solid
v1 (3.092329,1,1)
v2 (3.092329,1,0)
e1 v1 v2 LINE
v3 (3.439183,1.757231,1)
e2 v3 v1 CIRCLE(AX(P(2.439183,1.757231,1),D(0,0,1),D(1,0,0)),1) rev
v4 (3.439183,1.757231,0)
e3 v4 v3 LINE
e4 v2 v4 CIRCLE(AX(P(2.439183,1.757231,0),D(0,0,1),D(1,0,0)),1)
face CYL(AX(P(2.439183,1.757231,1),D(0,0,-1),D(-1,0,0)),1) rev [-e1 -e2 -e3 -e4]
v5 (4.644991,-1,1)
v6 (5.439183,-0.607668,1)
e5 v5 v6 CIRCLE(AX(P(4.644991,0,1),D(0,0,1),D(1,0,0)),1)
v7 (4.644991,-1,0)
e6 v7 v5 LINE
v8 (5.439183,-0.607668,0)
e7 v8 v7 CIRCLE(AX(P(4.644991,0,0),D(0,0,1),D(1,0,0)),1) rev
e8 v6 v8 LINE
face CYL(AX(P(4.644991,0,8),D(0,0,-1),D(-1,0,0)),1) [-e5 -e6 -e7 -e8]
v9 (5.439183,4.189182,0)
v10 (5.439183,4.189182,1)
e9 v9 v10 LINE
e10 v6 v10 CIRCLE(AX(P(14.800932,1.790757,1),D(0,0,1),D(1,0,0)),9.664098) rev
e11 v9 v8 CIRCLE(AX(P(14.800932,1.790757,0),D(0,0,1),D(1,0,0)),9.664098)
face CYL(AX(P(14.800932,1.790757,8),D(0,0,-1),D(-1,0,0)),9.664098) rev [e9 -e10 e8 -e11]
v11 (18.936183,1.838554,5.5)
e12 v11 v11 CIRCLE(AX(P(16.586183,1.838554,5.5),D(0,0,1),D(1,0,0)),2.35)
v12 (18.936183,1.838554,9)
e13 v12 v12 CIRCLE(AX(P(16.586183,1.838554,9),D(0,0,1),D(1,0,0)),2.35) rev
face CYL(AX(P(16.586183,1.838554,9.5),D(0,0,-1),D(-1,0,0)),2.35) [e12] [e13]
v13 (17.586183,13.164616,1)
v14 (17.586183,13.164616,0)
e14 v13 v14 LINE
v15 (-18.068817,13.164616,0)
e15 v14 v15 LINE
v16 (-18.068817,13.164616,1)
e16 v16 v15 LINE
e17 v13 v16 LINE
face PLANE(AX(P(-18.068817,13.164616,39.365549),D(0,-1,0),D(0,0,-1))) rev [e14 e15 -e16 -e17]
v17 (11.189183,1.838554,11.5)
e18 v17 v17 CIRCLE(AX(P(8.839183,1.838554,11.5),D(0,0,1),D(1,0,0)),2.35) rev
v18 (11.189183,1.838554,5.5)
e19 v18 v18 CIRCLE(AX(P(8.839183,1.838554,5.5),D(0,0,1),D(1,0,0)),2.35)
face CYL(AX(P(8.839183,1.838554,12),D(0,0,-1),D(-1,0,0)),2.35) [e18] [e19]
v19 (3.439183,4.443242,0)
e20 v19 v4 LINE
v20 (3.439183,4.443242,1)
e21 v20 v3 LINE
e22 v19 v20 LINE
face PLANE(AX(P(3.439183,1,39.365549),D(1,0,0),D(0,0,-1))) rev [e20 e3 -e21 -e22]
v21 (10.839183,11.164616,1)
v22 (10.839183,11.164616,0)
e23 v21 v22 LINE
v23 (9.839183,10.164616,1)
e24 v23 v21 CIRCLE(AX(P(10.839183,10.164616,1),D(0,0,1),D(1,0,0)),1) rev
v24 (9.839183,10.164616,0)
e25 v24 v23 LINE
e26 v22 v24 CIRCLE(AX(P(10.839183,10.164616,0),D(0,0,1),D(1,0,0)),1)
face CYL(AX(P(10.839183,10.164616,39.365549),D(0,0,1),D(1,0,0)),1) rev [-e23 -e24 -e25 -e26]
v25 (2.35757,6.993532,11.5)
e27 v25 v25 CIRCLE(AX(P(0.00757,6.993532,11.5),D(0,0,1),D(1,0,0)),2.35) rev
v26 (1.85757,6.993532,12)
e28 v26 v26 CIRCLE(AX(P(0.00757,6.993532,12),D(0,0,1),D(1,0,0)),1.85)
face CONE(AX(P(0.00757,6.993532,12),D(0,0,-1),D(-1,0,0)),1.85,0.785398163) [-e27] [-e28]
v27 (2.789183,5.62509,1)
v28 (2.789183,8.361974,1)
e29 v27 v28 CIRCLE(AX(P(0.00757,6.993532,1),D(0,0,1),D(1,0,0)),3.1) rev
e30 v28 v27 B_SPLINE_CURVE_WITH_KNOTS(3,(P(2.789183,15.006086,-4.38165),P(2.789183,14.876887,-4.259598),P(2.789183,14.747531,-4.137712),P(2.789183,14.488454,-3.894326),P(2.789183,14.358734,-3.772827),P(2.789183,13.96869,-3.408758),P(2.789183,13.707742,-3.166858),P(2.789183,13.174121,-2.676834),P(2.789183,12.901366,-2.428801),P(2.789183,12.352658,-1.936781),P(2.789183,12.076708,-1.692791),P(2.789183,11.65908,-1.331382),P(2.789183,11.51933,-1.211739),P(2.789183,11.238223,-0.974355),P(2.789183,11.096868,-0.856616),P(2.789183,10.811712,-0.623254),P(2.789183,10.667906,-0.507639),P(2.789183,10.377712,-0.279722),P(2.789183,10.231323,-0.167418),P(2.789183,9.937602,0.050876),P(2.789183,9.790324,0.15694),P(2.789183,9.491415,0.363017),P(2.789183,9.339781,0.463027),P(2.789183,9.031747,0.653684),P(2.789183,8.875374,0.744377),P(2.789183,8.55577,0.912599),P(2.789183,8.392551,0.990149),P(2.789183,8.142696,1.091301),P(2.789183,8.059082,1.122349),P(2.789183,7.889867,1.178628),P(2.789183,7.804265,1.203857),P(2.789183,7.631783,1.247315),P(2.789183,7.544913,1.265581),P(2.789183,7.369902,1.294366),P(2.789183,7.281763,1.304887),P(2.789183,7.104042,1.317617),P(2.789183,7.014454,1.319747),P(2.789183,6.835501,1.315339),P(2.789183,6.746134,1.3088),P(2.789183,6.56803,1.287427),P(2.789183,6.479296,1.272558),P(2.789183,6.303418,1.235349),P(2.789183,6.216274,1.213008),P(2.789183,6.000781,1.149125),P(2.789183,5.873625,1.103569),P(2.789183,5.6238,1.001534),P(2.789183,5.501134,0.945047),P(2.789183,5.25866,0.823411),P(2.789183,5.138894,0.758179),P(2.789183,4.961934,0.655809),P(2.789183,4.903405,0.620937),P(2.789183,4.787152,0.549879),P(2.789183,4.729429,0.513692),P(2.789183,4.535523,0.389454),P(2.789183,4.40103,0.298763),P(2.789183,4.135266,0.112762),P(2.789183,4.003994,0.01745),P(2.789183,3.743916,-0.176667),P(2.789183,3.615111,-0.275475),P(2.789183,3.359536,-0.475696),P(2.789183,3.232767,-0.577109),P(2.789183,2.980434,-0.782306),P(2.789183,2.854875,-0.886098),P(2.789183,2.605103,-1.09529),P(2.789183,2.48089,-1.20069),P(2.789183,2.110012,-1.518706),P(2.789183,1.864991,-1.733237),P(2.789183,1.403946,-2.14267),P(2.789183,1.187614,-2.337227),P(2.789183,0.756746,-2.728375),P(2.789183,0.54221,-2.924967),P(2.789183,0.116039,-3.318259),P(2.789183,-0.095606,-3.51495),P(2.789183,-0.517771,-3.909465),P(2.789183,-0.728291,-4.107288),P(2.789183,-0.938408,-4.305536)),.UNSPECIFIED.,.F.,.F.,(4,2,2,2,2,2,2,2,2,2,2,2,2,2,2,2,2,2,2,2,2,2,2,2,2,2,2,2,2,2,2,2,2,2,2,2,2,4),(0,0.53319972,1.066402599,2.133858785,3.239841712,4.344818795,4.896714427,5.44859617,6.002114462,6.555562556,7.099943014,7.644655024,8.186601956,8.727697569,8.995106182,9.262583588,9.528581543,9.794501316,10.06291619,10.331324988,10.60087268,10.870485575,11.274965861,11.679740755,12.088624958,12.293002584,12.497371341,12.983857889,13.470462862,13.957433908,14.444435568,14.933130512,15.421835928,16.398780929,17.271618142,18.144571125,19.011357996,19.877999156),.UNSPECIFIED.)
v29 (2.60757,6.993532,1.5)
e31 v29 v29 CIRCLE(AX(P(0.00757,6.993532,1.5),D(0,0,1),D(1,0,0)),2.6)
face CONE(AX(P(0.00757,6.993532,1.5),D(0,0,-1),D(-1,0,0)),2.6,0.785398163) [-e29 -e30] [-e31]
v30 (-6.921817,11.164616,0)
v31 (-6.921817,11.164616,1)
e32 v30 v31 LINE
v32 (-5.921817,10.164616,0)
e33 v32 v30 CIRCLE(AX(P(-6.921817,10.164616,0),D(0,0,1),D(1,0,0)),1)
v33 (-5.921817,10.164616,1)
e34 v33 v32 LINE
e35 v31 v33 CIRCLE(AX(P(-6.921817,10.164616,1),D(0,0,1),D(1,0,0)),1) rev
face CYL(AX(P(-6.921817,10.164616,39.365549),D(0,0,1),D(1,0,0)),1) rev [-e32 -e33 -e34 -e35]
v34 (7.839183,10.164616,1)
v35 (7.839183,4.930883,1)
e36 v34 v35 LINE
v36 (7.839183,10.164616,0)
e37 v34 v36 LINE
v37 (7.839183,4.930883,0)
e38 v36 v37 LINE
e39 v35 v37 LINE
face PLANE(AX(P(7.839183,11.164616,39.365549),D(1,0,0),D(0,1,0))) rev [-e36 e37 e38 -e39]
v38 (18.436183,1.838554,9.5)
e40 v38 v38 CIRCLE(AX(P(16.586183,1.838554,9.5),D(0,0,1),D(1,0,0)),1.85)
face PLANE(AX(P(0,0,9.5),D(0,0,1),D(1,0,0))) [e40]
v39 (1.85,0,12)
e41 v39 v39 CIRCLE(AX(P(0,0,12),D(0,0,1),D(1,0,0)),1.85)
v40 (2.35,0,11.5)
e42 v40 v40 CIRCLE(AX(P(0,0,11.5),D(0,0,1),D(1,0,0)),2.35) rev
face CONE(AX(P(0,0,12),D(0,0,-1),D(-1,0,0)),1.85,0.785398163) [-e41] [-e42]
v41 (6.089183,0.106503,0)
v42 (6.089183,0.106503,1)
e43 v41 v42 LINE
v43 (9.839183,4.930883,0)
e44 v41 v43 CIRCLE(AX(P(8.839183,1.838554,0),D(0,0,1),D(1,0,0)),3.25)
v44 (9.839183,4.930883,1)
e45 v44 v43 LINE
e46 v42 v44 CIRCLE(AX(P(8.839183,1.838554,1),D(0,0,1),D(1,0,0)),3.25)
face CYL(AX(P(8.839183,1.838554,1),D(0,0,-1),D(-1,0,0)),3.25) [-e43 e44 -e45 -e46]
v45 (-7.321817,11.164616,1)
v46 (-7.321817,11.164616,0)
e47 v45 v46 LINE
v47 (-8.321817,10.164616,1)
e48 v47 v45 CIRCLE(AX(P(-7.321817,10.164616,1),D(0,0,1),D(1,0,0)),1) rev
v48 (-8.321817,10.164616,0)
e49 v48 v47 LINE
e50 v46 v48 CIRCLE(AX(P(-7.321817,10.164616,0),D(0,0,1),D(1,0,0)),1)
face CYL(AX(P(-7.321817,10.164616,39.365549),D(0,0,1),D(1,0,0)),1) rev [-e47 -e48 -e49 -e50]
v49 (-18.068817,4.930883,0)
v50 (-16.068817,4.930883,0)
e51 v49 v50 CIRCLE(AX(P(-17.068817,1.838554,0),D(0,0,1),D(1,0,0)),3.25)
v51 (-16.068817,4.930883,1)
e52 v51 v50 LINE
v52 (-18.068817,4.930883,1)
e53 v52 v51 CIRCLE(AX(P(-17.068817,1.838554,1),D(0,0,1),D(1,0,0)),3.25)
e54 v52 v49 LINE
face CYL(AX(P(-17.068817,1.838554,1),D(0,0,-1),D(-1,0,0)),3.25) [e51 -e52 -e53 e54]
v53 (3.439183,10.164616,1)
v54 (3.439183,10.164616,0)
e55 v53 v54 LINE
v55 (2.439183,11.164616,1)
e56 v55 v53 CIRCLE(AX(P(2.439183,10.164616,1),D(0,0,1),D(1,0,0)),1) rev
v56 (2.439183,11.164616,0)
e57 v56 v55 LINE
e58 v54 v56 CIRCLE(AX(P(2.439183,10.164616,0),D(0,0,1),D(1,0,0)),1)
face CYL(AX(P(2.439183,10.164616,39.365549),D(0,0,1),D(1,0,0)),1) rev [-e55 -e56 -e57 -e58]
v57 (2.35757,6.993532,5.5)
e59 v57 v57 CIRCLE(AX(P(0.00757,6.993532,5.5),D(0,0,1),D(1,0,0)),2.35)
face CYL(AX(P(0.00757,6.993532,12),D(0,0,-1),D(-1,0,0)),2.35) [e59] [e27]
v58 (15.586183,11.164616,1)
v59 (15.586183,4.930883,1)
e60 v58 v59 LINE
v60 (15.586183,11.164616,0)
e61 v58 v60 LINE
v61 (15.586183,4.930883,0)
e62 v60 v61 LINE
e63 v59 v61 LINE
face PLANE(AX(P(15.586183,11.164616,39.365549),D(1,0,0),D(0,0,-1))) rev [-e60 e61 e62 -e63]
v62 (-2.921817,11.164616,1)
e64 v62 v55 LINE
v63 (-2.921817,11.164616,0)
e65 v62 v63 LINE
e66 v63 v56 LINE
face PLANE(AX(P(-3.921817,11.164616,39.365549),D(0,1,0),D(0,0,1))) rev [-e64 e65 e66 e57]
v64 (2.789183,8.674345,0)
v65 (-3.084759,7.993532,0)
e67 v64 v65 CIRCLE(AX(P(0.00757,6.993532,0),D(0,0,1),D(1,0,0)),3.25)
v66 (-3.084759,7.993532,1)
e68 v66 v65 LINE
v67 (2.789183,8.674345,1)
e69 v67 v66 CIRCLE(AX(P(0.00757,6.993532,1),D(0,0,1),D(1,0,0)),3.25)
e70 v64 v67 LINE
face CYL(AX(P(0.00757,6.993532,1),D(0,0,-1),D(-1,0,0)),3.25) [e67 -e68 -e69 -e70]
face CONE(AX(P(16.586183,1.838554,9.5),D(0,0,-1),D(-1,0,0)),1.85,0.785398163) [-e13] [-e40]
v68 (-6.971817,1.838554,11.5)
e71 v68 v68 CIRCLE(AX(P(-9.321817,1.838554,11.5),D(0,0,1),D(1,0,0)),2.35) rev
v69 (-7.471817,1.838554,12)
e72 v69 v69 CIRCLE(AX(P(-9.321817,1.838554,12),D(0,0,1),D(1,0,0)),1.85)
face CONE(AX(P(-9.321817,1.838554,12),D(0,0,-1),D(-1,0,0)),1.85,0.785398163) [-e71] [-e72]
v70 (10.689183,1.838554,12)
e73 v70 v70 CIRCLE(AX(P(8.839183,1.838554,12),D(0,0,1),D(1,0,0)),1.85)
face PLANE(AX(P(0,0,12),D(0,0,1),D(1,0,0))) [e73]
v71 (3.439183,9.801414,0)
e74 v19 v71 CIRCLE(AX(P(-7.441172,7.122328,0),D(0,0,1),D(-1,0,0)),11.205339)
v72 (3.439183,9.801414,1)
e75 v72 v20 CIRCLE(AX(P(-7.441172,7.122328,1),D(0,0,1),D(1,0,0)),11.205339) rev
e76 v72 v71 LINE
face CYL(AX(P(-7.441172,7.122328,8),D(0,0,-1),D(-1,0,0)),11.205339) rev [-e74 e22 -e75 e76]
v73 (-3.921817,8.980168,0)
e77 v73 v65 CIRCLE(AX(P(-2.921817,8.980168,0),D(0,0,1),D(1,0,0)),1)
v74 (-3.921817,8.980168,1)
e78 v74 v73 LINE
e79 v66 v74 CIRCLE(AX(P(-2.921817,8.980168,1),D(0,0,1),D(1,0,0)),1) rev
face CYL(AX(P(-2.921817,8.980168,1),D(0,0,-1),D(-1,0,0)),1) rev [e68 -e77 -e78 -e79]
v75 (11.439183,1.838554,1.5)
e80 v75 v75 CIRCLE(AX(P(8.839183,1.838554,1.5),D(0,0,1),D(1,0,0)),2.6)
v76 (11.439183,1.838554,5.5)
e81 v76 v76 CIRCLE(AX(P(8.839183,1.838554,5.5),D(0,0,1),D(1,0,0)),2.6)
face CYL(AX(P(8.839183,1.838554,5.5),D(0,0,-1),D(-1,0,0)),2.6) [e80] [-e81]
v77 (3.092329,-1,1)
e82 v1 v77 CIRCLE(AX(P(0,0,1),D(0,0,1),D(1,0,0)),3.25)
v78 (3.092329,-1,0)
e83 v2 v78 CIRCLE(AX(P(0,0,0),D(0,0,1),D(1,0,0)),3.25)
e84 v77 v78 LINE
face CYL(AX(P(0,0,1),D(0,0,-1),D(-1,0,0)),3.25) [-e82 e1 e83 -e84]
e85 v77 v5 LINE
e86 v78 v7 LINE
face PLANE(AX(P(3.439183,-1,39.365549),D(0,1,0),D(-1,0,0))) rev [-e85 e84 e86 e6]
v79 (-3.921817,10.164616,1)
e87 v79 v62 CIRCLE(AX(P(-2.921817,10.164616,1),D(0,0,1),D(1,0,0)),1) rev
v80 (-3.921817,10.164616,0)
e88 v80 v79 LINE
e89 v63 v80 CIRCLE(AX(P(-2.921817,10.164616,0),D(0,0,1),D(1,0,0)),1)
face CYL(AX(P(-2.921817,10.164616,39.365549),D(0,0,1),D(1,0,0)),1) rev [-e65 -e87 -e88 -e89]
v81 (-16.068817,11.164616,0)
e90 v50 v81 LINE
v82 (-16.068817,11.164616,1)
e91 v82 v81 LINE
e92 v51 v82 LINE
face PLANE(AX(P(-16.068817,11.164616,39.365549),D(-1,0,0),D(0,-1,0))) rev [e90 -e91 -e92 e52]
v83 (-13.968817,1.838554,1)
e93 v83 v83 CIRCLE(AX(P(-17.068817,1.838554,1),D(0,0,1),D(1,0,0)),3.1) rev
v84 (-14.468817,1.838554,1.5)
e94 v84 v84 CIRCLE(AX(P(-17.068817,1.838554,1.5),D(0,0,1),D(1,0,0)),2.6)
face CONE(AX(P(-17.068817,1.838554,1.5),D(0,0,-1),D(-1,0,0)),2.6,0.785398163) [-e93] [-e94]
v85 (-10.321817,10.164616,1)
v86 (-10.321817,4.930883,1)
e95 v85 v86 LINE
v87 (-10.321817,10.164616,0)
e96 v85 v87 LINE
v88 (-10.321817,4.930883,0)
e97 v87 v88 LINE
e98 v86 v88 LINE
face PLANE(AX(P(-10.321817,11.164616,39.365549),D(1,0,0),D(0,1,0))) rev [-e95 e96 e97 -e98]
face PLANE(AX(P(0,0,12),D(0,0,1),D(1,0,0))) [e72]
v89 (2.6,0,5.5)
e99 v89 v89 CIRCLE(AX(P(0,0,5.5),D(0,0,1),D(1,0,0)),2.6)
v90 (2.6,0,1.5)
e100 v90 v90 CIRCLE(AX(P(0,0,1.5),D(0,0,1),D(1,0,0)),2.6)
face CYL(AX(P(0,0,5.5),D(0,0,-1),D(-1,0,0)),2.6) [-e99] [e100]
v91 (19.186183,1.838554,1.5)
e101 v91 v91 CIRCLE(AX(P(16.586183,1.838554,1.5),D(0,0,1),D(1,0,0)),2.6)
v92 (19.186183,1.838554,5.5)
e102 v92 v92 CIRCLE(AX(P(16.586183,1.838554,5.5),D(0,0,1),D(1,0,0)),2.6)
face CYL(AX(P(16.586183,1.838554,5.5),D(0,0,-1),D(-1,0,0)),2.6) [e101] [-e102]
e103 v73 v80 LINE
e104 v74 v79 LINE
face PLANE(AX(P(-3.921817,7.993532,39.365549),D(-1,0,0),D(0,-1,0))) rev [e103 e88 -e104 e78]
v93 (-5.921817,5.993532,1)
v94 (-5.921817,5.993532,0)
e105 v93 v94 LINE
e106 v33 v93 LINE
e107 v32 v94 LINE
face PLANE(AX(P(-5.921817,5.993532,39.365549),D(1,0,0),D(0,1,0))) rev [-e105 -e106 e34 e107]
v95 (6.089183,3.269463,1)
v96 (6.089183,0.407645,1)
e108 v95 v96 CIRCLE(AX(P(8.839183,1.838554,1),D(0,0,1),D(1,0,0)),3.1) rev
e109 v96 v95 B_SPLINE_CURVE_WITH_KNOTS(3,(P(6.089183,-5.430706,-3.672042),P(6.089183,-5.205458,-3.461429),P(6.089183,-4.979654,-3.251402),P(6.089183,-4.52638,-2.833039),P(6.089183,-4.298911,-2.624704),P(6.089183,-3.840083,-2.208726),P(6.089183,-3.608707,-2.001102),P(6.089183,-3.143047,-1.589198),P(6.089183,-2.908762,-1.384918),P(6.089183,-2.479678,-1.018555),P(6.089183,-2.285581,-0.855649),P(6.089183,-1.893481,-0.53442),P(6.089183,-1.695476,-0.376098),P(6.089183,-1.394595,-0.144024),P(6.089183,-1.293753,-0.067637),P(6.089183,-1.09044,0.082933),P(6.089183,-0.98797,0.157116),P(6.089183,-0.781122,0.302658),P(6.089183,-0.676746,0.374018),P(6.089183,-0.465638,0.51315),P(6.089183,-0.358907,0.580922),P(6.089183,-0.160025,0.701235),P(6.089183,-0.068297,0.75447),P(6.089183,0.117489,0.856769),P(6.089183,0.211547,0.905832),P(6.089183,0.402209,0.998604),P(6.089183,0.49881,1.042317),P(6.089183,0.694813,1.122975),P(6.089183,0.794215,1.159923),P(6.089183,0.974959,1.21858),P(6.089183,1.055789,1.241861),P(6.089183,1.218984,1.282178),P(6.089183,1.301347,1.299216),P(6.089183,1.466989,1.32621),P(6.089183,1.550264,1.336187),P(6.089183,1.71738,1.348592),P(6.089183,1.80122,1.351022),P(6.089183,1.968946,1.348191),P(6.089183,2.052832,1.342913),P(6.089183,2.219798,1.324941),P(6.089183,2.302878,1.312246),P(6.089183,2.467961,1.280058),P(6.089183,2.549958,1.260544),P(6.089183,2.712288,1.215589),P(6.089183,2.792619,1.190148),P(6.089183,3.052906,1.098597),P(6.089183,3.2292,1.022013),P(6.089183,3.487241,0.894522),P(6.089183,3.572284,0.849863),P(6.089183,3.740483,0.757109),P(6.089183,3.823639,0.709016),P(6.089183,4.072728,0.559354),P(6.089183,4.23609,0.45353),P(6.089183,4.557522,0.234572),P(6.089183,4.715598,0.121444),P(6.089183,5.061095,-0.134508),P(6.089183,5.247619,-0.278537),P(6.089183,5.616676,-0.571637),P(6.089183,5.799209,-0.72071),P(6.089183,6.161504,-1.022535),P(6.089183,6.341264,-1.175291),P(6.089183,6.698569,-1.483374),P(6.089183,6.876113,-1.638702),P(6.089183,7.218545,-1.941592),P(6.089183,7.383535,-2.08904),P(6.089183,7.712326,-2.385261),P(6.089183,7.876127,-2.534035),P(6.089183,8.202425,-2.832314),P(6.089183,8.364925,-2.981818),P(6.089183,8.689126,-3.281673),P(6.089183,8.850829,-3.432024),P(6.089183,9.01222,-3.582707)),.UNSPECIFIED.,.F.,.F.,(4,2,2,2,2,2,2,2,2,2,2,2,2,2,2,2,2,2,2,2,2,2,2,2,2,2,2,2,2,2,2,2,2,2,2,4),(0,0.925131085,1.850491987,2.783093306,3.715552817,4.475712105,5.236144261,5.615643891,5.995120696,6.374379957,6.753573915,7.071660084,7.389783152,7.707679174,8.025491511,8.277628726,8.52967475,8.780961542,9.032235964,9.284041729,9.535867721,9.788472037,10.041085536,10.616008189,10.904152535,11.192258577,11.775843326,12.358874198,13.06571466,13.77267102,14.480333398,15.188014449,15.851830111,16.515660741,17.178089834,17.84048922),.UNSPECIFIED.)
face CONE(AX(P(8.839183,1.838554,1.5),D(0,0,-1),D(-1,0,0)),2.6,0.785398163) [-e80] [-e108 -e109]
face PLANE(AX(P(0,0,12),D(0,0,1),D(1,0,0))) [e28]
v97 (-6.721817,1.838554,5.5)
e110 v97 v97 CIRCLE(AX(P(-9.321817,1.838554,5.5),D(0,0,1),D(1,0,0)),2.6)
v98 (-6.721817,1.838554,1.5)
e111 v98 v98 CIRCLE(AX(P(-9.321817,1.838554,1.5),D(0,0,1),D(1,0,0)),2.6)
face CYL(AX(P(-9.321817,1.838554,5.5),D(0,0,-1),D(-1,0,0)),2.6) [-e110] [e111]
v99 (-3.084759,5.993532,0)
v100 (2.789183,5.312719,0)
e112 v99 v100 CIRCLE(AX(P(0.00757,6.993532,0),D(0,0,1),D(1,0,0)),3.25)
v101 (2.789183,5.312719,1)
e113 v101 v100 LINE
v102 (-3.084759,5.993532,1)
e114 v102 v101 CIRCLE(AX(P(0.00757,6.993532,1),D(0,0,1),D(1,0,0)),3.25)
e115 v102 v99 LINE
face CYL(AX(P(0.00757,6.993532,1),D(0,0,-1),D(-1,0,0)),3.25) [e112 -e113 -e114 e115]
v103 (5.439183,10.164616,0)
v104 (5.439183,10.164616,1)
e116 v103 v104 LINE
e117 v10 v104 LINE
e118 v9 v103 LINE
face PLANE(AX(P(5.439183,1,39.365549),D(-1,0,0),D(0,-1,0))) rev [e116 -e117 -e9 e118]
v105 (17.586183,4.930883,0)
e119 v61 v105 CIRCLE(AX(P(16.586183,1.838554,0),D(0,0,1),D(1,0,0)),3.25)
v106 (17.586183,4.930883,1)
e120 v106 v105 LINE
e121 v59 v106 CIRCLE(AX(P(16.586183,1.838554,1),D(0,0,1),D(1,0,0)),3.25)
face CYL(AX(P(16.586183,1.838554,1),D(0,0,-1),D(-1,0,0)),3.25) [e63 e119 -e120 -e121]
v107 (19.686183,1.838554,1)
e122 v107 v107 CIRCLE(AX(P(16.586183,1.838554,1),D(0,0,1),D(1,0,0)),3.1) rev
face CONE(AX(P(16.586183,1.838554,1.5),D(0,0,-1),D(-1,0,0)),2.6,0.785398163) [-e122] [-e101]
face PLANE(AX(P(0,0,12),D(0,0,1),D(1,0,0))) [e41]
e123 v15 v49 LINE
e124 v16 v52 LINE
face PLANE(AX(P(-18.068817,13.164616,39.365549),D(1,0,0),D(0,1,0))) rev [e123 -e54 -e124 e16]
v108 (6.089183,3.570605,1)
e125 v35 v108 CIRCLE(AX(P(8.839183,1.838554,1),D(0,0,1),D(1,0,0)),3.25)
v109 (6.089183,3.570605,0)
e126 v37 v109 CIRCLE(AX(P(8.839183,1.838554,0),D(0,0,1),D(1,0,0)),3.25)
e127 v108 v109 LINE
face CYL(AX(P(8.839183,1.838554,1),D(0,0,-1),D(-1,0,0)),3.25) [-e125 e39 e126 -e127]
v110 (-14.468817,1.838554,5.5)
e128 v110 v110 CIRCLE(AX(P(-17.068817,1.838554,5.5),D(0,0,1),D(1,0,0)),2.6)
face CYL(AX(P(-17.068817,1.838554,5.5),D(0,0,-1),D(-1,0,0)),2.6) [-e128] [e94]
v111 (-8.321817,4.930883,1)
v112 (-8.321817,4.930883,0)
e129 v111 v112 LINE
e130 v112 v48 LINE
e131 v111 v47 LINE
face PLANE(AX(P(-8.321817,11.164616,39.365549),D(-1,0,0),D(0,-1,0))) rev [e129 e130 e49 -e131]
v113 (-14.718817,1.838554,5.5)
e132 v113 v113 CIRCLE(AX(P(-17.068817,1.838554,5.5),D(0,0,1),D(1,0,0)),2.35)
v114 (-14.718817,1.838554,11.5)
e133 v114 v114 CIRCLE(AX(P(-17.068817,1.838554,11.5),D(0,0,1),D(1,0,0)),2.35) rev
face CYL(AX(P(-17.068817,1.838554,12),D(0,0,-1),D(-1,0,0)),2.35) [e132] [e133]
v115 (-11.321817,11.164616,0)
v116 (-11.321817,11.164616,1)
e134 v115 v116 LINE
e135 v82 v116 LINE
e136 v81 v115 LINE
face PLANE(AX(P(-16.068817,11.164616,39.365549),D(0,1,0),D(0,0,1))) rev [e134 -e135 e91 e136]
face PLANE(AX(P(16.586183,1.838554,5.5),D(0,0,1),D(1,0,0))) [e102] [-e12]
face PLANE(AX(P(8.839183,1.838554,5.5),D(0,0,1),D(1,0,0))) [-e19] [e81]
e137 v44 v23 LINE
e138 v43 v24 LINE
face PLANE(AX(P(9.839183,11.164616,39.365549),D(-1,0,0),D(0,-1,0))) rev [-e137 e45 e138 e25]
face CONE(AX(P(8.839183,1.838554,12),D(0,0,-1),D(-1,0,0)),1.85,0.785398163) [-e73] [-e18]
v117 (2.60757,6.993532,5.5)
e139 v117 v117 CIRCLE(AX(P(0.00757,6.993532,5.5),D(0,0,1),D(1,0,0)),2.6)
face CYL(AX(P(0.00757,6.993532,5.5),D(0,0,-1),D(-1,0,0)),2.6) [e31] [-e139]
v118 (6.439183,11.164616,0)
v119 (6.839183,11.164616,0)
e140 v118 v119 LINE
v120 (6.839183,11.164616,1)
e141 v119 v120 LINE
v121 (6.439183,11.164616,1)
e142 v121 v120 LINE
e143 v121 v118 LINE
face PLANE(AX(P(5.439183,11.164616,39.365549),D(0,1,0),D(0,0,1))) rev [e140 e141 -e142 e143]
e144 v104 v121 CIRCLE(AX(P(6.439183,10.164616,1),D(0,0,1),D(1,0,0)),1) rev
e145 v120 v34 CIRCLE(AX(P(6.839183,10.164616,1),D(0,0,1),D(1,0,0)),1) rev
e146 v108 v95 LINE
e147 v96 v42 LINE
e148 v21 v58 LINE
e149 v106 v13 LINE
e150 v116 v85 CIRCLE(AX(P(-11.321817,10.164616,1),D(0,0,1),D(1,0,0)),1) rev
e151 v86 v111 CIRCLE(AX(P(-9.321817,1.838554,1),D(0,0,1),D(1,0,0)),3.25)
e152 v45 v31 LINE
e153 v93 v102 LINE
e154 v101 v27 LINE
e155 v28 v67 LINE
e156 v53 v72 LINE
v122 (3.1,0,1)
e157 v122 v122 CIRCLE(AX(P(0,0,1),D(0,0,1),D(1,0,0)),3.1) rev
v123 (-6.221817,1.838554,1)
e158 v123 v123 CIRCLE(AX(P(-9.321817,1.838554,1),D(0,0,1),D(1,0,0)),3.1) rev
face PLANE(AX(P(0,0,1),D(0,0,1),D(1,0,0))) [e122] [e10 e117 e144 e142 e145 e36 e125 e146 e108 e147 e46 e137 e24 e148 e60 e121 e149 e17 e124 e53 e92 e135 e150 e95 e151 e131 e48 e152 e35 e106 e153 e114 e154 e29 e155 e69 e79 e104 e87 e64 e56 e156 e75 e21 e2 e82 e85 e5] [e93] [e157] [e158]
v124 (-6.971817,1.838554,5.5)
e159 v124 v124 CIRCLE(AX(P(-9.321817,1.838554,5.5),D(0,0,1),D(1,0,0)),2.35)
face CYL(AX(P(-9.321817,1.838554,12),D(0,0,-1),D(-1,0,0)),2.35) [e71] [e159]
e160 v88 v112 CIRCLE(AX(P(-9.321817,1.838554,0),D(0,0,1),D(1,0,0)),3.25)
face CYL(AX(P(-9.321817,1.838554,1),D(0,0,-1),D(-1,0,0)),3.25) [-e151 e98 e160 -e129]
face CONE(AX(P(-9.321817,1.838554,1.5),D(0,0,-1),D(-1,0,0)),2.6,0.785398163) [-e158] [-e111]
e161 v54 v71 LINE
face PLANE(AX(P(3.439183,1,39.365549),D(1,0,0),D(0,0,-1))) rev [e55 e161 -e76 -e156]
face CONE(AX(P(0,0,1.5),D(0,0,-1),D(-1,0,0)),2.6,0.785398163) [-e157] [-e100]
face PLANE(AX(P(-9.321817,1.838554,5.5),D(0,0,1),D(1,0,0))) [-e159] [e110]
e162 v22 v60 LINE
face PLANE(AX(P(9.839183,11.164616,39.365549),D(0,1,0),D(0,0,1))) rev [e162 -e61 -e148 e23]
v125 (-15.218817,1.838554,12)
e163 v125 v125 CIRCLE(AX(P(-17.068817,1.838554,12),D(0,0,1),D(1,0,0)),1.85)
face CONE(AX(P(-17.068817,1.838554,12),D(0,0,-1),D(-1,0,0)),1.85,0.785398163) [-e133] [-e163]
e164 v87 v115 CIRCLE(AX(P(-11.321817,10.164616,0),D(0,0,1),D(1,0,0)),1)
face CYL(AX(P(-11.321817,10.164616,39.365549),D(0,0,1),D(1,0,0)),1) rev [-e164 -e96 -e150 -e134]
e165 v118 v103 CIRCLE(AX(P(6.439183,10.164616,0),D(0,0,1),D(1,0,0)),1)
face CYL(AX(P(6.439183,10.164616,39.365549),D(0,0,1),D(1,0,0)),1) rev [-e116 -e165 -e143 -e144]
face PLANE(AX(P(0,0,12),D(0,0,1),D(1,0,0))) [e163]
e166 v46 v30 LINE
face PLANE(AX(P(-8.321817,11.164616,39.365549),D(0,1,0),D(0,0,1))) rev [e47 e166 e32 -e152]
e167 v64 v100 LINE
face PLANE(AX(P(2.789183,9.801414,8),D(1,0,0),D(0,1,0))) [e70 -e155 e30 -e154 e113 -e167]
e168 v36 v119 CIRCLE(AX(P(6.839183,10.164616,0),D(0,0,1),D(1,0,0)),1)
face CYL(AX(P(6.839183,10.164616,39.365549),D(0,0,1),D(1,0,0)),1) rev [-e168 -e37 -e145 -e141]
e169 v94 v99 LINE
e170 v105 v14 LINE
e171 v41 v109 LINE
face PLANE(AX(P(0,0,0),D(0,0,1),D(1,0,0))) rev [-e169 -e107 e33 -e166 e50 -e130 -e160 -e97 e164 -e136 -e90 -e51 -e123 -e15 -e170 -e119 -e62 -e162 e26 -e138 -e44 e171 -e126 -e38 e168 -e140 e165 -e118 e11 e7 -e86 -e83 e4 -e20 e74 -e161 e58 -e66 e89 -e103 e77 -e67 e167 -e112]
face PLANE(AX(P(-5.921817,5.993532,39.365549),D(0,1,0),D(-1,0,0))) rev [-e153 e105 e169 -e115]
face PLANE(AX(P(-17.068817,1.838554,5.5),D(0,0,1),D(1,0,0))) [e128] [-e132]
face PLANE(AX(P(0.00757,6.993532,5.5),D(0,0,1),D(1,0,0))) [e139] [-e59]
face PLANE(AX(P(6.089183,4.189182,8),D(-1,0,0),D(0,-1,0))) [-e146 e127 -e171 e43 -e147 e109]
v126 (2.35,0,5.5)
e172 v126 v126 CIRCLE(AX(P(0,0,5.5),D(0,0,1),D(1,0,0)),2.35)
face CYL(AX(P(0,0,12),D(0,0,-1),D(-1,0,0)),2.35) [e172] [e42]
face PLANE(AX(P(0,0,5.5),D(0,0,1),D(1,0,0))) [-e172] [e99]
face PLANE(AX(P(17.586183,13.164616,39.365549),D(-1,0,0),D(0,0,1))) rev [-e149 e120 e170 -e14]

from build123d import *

# Parameters (mm, degrees)
SKIZZE1_R                            = 2.35
AUFSATZ_LINEAR_AUSTRAGEN1_DEPTH      = 12
AUFSATZ_LINEAR_AUSTRAGEN1_2_DEPTH    = 12
AUFSATZ_LINEAR_AUSTRAGEN1_3_DEPTH    = 12
AUFSATZ_LINEAR_AUSTRAGEN1_4_DEPTH    = 12
AUFSATZ_LINEAR_AUSTRAGEN1_5_DEPTH    = 12
SKIZZE1_3_R                          = 2.35
AUFSATZ_LINEAR_AUSTRAGEN4_DEPTH      = 9.5
SKIZZE2_R                            = 3.25
AUFSATZ_LINEAR_AUSTRAGEN2_DEPTH      = 1
AUFSATZ_LINEAR_AUSTRAGEN3_DEPTH      = 1
SKIZZE5_R                            = 2.6
AUFSATZ_LINEAR_AUSTRAGEN5_DEPTH      = 4.5
FASE1_SIZE                           = 0.5
FASE2_SIZE                           = 0.5
FASE3_SIZE                           = 0.5
SCHNITT_LINEAR_AUSTRAGEN1_DEPTH      = 7
SCHNITT_LINEAR_AUSTRAGEN1_DEPTH_BACK = 27.592507318
VERRUNDUNG1_R                        = 1


with BuildPart() as part:
    # Skizze1 → Aufsatz-Linear austragen1 (new body)
    with BuildSketch(Plane.XY):
        with Locations((-17.068817434, 1.838554139)):
            Circle(SKIZZE1_R)
    extrude(amount=AUFSATZ_LINEAR_AUSTRAGEN1_DEPTH)



with BuildPart() as body_2:
    # Skizze1 → Aufsatz-Linear austragen1 2 (new body)
    with BuildSketch(Plane.XY):
        with Locations((-9.321817434, 1.838554139)):
            Circle(SKIZZE1_R)
    extrude(amount=AUFSATZ_LINEAR_AUSTRAGEN1_2_DEPTH)


with BuildPart() as body_3:
    # Skizze1 → Aufsatz-Linear austragen1 3 (new body)
    with BuildSketch(Plane.XY):
        Circle(SKIZZE1_R)
    extrude(amount=AUFSATZ_LINEAR_AUSTRAGEN1_3_DEPTH)


with BuildPart() as body_4:
    # Skizze1 → Aufsatz-Linear austragen1 4 (new body)
    with BuildSketch(Plane.XY):
        with Locations((0.007570249, 6.993531953)):
            Circle(SKIZZE1_R)
    extrude(amount=AUFSATZ_LINEAR_AUSTRAGEN1_4_DEPTH)


with BuildPart() as body_5:
    # Skizze1 → Aufsatz-Linear austragen1 5 (new body)
    with BuildSketch(Plane.XY):
        with Locations((8.839182566, 1.838554139)):
            Circle(SKIZZE1_R)
    extrude(amount=AUFSATZ_LINEAR_AUSTRAGEN1_5_DEPTH)


with BuildPart() as body_6:
    # Skizze1<3> → Aufsatz-Linear austragen4 (new body)
    with BuildSketch(Plane.XY):
        with Locations((16.586182566, 1.838554139)):
            Circle(SKIZZE1_3_R)
    extrude(amount=AUFSATZ_LINEAR_AUSTRAGEN4_DEPTH)


with BuildPart() as part_1:
    add(part.part)

    add(body_2.part)  # Aufsatz-Linear austragen2 merges body 2

    add(body_3.part)  # Aufsatz-Linear austragen2 merges body 3

    add(body_4.part)  # Aufsatz-Linear austragen2 merges body 4

    add(body_5.part)  # Aufsatz-Linear austragen2 merges body 5

    add(body_6.part)  # Aufsatz-Linear austragen2 merges body 6
    # Skizze2 → Aufsatz-Linear austragen2 (add)
    with BuildSketch(Plane.XY):
        with Locations((-17.068817434, 1.838554139)):
            Circle(SKIZZE2_R)
        with Locations((-9.321817434, 1.838554139)):
            Circle(SKIZZE2_R)
        Circle(SKIZZE2_R)
        with Locations((0.007570249, 6.993531953)):
            Circle(SKIZZE2_R)
        with Locations((8.839182566, 1.838554139)):
            Circle(SKIZZE2_R)
        with Locations((16.586182566, 1.838554139)):
            Circle(SKIZZE2_R)
    extrude(amount=AUFSATZ_LINEAR_AUSTRAGEN2_DEPTH)

    # Skizze3 → Aufsatz-Linear austragen3 (add)
    with BuildSketch(Plane.XY):
        Polygon((-18.068817434, 13.164615586), (-18.068817434, 4.930883358), (-16.068817434, 4.930883358), (-16.068817434, 11.164615586), (-10.321817434, 11.164615586), (-10.321817434, 4.930883358), (-8.321817434, 4.930883358), (-8.321817434, 11.164615586), (-5.921817434, 11.164615586), (-5.921817434, 5.993531953), (-3.08475897, 5.993531953), (-3.08475897, 7.993531953), (-3.921817434, 7.993531953), (-3.921817434, 11.164615586), (3.439182566, 11.164615586), (3.439182566, 1), (3.092329219, 1), (3.092329219, -1), (3.439182566, -1), (5.439182566, -1), (5.439182566, 1), (5.439182566, 11.164615586), (7.839182566, 11.164615586), (7.839182566, 4.930883358), (9.839182566, 4.930883358), (9.839182566, 11.164615586), (15.586182566, 11.164615586), (15.586182566, 4.930883358), (17.586182566, 4.930883358), (17.586182566, 13.164615586), align=None)
    extrude(amount=AUFSATZ_LINEAR_AUSTRAGEN3_DEPTH)

    # Skizze5 → Aufsatz-Linear austragen5 (add)
    with BuildSketch(Plane.XY.offset(1)):
        with Locations((-17.068817434, 1.838554139)):
            Circle(SKIZZE5_R)
        with Locations((-9.321817434, 1.838554139)):
            Circle(SKIZZE5_R)
        with Locations((0.007570249, 6.993531953)):
            Circle(SKIZZE5_R)
        Circle(SKIZZE5_R)
        with Locations((8.839182566, 1.838554139)):
            Circle(SKIZZE5_R)
        with Locations((16.586182566, 1.838554139)):
            Circle(SKIZZE5_R)
    extrude(amount=AUFSATZ_LINEAR_AUSTRAGEN5_DEPTH)

    # Fase1
    fase1_edges = [part_1.edges().sort_by_distance(p)[0] for p in [
        (-19.418817434, 1.838554139, 12),
        (-2.35, 0, 12),
        (-2.342429751, 6.993531953, 12),
        (6.489182566, 1.838554139, 12),
        (-11.671817434, 1.838554139, 12),
    ]]
    chamfer(fase1_edges, length=FASE1_SIZE)

    # Fase2
    fase2_edges = [part_1.edges().sort_by_distance(p)[0] for p in [
        (-19.668817434, 1.838554139, 1),
        (-11.921817434, 1.838554139, 1),
        (-2.592429751, 6.993531953, 1),
        (-2.6, 0, 1),
        (6.239182566, 1.838554139, 1),
        (13.986182566, 1.838554139, 1),
    ]]
    chamfer(fase2_edges, length=FASE2_SIZE)

    # Fase3
    fase3_edges = [part_1.edges().sort_by_distance(p)[0] for p in [
        (14.236182566, 1.838554139, 9.5),
    ]]
    chamfer(fase3_edges, length=FASE3_SIZE)

    # Skizze6 → Schnitt-Linear austragen1 (cut, two sides: drawn at the far end of the back side and taken through both)
    with BuildSketch(Plane.XY.offset(1).offset(-SCHNITT_LINEAR_AUSTRAGEN1_DEPTH_BACK)):
        with BuildLine():
            Line((2.789182566, 9.801413918), (2.789182566, 4.443241997))
            Line((2.789182566, 4.443241997), (3.439182566, 4.443241997))
            ThreePointArc((3.439182566, 4.443241997), (3.764166783, 7.122327957), (3.439182566, 9.801413918))
            Line((3.439182566, 9.801413918), (2.789182566, 9.801413918))
        make_face()
        with BuildLine():
            Line((6.089182566, 4.189181846), (6.089182566, -0.607667928))
            Line((6.089182566, -0.607667928), (5.439182566, -0.607667928))
            ThreePointArc((5.439182566, -0.607667928), (5.136833773, 1.790756959), (5.439182566, 4.189181846))
            Line((5.439182566, 4.189181846), (6.089182566, 4.189181846))
        make_face()
    extrude(amount=SCHNITT_LINEAR_AUSTRAGEN1_DEPTH + SCHNITT_LINEAR_AUSTRAGEN1_DEPTH_BACK, mode=Mode.SUBTRACT)

    # Verrundung1
    # the kernel refuses this fillet: 1 mm, written as the material it adds along each edge
    with BuildSketch(Plane(origin=(3.439182566, 1, 0), x_dir=(-1, 0, 0), z_dir=(0, 0, 1))) as verrundung1_piece_1:
        with BuildLine():
            CenterArc((1, -0.757231437), VERRUNDUNG1_R, 130.779268334, 49.220731666)
            Line((0, -0.757231437), (-0.02, -0.757231437))
            Line((-0.02, -0.757231437), (-0.02, 0))
            Line((-0.02, 0), (0, 0.02))
            ThreePointArc((0, 0.02), (0.173426673, 0.02), (0.333790414, 0.015144629))
            Line((0.333790414, 0.015144629), (0.346853347, 0))
        make_face()
    extrude(amount=1)
    with BuildSketch(Plane(origin=(9.839182566, 11.164615586, 0), x_dir=(1, 0, 0), z_dir=(0, 0, 1)), Plane(origin=(7.839182566, 11.164615586, 0), x_dir=(0, -1, 0), z_dir=(0, 0, 1)), Plane(origin=(3.439182566, 11.164615586, 0), x_dir=(0, -1, 0), z_dir=(0, 0, 1)), Plane(origin=(5.439182566, 11.164615586, 0), x_dir=(1, 0, 0), z_dir=(0, 0, 1)), Plane(origin=(-10.321817434, 11.164615586, 0), x_dir=(0, -1, 0), z_dir=(0, 0, 1)), Plane(origin=(-8.321817434, 11.164615586, 0), x_dir=(1, 0, 0), z_dir=(0, 0, 1)), Plane(origin=(-3.921817434, 11.164615586, 0), x_dir=(1, 0, 0), z_dir=(0, 0, 1)), Plane(origin=(-5.921817434, 11.164615586, 0), x_dir=(0, -1, 0), z_dir=(0, 0, 1))) as verrundung1_piece_2:
        with BuildLine():
            CenterArc((VERRUNDUNG1_R, -VERRUNDUNG1_R), VERRUNDUNG1_R, 90, 90)
            Line((0, -VERRUNDUNG1_R), (-VERRUNDUNG1_R * 0.02, -VERRUNDUNG1_R))
            Line((-VERRUNDUNG1_R * 0.02, -VERRUNDUNG1_R), (-VERRUNDUNG1_R * 0.02, VERRUNDUNG1_R * 0.02))
            Line((-VERRUNDUNG1_R * 0.02, VERRUNDUNG1_R * 0.02), (VERRUNDUNG1_R, VERRUNDUNG1_R * 0.02))
            Line((VERRUNDUNG1_R, VERRUNDUNG1_R * 0.02), (VERRUNDUNG1_R, 0))
        make_face()
    extrude(amount=1)
    with BuildSketch(Plane(origin=(-3.921817434, 7.993531953, 0), x_dir=(0, 1, 0), z_dir=(0, 0, 1))) as verrundung1_piece_3:
        with BuildLine():
            CenterArc((0.986635726, -1), VERRUNDUNG1_R, 90, 80.622325088)
            Line((0, -0.837058464), (-0.019732715, -0.833799634))
            ThreePointArc((-0.019732715, -0.833799634), (-0.02, -0.418529232), (-0.02, 0))
            Line((-0.02, 0), (0, 0.02))
            Line((0, 0.02), (0.986635726, 0.02))
            Line((0.986635726, 0.02), (0.986635726, 0))
        make_face()
    extrude(amount=1)
    # the kernel refuses this fillet: 1 mm, written as the material it takes off along each edge
    with BuildSketch(Plane(origin=(5.439182566, -1, -1.985478044), x_dir=(0, 1, 0), z_dir=(0, 0, 1))) as verrundung1_2_piece_1:
        with BuildLine():
            CenterArc((1, 0.794191217), VERRUNDUNG1_R, 180, 52.578930711)
            Line((0, 0.794191217), (-0.02, 0.794191217))
            Line((-0.02, 0.794191217), (-0.02, 0))
            Line((-0.02, 0), (0, -0.02))
            ThreePointArc((0, -0.02), (0.196166036, -0.02), (0.380178714, -0.015883824))
            Line((0.380178714, -0.015883824), (0.392332072, 0))
        make_face()
    extrude(amount=4.970956087, mode=Mode.SUBTRACT)


solid = part_1.part
